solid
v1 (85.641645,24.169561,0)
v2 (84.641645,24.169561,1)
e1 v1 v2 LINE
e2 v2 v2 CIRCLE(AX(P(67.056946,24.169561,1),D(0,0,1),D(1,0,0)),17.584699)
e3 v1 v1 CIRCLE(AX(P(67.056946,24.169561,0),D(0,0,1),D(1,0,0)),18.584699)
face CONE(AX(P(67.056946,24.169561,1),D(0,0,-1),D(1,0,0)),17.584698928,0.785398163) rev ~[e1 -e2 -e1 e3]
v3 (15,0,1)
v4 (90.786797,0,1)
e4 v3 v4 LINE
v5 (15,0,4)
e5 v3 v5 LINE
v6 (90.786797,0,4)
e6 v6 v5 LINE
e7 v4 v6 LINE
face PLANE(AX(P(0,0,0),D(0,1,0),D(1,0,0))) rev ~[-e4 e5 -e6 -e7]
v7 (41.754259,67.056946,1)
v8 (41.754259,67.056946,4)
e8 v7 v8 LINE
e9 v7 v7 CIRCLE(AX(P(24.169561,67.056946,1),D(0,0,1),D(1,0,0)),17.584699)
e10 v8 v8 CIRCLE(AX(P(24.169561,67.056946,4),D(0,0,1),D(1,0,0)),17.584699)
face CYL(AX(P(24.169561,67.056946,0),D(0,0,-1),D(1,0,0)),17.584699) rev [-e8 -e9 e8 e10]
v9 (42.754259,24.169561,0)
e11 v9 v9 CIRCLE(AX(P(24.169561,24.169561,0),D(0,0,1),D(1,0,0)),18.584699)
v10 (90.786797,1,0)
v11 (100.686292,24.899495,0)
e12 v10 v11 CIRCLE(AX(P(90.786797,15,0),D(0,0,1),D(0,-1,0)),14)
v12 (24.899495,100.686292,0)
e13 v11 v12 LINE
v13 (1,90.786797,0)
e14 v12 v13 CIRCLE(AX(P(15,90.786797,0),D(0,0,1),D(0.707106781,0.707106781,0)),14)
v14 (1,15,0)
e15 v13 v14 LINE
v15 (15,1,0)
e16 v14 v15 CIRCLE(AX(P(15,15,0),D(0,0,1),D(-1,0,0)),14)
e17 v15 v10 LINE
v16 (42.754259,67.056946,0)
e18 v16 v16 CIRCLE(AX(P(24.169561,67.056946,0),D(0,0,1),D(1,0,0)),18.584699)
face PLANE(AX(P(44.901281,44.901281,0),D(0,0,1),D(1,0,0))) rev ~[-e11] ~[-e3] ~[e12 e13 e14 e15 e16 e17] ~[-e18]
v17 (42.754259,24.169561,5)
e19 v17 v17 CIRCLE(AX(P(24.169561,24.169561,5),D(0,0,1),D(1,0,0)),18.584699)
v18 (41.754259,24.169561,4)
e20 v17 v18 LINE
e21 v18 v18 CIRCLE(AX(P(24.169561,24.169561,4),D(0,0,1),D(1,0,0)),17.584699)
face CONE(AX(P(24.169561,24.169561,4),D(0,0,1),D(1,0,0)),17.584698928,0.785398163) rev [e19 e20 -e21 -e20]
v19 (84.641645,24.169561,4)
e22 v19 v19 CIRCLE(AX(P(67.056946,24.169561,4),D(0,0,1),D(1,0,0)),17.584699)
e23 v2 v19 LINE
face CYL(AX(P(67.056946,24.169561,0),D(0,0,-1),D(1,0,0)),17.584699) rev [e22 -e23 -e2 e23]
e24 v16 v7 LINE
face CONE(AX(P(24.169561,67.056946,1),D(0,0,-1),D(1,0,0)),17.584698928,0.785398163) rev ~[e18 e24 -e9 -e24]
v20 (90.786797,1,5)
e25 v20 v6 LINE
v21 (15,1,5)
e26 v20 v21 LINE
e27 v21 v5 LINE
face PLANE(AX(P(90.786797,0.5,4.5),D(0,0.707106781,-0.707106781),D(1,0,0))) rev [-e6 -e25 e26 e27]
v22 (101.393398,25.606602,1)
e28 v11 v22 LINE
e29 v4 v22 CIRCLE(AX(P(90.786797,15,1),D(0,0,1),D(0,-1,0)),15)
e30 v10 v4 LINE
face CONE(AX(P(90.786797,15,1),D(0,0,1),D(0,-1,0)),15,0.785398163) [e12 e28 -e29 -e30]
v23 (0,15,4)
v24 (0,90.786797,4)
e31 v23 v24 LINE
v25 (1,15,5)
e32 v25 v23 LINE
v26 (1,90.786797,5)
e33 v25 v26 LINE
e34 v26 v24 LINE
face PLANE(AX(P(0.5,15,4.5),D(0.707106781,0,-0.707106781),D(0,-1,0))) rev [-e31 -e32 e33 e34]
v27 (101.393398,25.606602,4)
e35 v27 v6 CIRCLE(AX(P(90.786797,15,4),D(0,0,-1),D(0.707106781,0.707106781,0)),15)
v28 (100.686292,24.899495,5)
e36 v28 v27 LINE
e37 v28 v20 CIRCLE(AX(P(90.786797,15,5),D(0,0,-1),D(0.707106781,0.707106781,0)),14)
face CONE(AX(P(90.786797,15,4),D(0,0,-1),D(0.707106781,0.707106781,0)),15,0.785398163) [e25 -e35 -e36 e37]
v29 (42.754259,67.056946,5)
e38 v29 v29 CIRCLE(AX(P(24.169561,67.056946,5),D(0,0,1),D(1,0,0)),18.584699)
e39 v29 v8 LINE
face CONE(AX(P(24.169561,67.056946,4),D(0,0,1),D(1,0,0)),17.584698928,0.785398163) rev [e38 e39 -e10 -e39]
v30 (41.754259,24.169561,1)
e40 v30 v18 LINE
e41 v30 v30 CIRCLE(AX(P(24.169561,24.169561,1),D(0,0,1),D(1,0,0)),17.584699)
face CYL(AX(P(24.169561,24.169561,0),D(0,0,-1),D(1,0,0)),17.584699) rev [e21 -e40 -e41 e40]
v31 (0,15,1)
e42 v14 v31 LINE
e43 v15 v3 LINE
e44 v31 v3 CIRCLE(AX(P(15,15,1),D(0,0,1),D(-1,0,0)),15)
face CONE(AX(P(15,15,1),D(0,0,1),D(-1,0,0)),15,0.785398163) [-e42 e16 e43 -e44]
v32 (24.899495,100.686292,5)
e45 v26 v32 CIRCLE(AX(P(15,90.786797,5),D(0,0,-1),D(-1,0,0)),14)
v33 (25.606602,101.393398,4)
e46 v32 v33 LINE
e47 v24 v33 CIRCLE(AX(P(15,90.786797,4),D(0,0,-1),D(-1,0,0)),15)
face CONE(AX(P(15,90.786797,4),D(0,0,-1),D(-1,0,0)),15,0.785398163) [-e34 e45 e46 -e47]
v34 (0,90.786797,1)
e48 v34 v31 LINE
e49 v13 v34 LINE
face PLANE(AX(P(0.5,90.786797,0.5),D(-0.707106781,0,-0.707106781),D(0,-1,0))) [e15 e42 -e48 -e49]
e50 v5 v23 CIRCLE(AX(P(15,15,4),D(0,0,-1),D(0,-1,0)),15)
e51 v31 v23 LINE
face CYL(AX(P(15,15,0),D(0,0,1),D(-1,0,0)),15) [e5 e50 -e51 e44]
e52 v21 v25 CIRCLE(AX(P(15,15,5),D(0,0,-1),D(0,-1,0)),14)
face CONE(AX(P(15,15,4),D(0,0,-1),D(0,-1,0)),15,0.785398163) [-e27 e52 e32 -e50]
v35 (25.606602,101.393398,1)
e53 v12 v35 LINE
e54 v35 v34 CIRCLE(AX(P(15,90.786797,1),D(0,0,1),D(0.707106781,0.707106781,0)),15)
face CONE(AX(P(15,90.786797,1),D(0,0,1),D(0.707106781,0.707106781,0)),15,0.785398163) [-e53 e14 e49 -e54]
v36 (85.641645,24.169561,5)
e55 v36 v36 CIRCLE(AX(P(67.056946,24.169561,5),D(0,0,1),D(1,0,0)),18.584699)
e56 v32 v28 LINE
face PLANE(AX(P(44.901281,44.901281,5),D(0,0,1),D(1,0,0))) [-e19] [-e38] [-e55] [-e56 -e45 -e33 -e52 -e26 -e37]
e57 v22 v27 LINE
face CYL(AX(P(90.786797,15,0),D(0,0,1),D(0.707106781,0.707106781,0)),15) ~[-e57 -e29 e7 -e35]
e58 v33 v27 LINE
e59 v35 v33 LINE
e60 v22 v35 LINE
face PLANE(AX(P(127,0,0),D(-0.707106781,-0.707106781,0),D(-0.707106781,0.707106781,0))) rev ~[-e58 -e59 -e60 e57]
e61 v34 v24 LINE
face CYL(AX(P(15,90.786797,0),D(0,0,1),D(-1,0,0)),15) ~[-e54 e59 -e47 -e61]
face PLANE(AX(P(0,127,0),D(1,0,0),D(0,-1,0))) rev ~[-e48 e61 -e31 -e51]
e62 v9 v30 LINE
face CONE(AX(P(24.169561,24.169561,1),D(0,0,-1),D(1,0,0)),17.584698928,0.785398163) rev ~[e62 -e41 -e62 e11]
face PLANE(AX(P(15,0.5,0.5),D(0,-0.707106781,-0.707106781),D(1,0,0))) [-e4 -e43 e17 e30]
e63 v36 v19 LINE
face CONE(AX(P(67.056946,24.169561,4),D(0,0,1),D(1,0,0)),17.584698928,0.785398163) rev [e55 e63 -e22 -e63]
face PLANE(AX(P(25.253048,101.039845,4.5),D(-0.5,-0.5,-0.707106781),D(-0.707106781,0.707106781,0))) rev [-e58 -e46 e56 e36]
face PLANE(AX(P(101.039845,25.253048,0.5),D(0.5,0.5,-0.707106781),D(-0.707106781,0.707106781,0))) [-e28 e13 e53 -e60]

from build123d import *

# Parameters (mm, degrees)
F0_R     = 17.5846989279
F1_DEPTH = 5
F2_R     = 15
F3_SIZE  = 1


# Not quite as in the source:
# - a feature names something its author has since deleted; it is built from what else it names


with BuildPart() as f1:
    # F0 (on Top) → F1 (new body)
    with BuildSketch(Plane.XY):
        Polygon((0, 127), (0, 0), (127, 0), align=None)
        with Locations((24.1695605218, 24.1695605218)):
            Circle(F0_R, mode=Mode.SUBTRACT)
        with Locations((67.0569464564, 24.1695605218)):
            Circle(F0_R, mode=Mode.SUBTRACT)
        with Locations((24.1695605218, 67.0569464564)):
            Circle(F0_R, mode=Mode.SUBTRACT)
    extrude(amount=F1_DEPTH)

    # F2
    f2_edges = [f1.edges().sort_by_distance(p)[0] for p in [
        (127, 0, 2.5),
        (0, 0, 2.5),
        (0, 127, 2.5),
    ]]
    fillet(f2_edges, radius=F2_R)

    # F3
    f3_edges = [f1.edges().sort_by_distance(p)[0] for p in [
        (104.64499, 9.259749, 5),
        (63.5, 63.5, 0),
        (6.584862, 24.169561, 5),
        (49.472248, 24.169561, 5),
        (6.584862, 67.056946, 0),
        (6.584862, 24.169561, 0),
        (49.472248, 24.169561, 0),
        (6.584862, 67.056946, 5),
        (0, 52.893398, 0),
        (0, 52.893398, 5),
        (9.259749, 104.64499, 0),
        (4.393398, 4.393398, 0),
        (52.893398, 0, 0),
        (104.64499, 9.259749, 0),
        (9.259749, 104.64499, 5),
        (4.393398, 4.393398, 5),
        (63.5, 63.5, 5),
        (52.893398, 0, 5),
    ]]
    chamfer(f3_edges, length=F3_SIZE)


solid = f1.part
